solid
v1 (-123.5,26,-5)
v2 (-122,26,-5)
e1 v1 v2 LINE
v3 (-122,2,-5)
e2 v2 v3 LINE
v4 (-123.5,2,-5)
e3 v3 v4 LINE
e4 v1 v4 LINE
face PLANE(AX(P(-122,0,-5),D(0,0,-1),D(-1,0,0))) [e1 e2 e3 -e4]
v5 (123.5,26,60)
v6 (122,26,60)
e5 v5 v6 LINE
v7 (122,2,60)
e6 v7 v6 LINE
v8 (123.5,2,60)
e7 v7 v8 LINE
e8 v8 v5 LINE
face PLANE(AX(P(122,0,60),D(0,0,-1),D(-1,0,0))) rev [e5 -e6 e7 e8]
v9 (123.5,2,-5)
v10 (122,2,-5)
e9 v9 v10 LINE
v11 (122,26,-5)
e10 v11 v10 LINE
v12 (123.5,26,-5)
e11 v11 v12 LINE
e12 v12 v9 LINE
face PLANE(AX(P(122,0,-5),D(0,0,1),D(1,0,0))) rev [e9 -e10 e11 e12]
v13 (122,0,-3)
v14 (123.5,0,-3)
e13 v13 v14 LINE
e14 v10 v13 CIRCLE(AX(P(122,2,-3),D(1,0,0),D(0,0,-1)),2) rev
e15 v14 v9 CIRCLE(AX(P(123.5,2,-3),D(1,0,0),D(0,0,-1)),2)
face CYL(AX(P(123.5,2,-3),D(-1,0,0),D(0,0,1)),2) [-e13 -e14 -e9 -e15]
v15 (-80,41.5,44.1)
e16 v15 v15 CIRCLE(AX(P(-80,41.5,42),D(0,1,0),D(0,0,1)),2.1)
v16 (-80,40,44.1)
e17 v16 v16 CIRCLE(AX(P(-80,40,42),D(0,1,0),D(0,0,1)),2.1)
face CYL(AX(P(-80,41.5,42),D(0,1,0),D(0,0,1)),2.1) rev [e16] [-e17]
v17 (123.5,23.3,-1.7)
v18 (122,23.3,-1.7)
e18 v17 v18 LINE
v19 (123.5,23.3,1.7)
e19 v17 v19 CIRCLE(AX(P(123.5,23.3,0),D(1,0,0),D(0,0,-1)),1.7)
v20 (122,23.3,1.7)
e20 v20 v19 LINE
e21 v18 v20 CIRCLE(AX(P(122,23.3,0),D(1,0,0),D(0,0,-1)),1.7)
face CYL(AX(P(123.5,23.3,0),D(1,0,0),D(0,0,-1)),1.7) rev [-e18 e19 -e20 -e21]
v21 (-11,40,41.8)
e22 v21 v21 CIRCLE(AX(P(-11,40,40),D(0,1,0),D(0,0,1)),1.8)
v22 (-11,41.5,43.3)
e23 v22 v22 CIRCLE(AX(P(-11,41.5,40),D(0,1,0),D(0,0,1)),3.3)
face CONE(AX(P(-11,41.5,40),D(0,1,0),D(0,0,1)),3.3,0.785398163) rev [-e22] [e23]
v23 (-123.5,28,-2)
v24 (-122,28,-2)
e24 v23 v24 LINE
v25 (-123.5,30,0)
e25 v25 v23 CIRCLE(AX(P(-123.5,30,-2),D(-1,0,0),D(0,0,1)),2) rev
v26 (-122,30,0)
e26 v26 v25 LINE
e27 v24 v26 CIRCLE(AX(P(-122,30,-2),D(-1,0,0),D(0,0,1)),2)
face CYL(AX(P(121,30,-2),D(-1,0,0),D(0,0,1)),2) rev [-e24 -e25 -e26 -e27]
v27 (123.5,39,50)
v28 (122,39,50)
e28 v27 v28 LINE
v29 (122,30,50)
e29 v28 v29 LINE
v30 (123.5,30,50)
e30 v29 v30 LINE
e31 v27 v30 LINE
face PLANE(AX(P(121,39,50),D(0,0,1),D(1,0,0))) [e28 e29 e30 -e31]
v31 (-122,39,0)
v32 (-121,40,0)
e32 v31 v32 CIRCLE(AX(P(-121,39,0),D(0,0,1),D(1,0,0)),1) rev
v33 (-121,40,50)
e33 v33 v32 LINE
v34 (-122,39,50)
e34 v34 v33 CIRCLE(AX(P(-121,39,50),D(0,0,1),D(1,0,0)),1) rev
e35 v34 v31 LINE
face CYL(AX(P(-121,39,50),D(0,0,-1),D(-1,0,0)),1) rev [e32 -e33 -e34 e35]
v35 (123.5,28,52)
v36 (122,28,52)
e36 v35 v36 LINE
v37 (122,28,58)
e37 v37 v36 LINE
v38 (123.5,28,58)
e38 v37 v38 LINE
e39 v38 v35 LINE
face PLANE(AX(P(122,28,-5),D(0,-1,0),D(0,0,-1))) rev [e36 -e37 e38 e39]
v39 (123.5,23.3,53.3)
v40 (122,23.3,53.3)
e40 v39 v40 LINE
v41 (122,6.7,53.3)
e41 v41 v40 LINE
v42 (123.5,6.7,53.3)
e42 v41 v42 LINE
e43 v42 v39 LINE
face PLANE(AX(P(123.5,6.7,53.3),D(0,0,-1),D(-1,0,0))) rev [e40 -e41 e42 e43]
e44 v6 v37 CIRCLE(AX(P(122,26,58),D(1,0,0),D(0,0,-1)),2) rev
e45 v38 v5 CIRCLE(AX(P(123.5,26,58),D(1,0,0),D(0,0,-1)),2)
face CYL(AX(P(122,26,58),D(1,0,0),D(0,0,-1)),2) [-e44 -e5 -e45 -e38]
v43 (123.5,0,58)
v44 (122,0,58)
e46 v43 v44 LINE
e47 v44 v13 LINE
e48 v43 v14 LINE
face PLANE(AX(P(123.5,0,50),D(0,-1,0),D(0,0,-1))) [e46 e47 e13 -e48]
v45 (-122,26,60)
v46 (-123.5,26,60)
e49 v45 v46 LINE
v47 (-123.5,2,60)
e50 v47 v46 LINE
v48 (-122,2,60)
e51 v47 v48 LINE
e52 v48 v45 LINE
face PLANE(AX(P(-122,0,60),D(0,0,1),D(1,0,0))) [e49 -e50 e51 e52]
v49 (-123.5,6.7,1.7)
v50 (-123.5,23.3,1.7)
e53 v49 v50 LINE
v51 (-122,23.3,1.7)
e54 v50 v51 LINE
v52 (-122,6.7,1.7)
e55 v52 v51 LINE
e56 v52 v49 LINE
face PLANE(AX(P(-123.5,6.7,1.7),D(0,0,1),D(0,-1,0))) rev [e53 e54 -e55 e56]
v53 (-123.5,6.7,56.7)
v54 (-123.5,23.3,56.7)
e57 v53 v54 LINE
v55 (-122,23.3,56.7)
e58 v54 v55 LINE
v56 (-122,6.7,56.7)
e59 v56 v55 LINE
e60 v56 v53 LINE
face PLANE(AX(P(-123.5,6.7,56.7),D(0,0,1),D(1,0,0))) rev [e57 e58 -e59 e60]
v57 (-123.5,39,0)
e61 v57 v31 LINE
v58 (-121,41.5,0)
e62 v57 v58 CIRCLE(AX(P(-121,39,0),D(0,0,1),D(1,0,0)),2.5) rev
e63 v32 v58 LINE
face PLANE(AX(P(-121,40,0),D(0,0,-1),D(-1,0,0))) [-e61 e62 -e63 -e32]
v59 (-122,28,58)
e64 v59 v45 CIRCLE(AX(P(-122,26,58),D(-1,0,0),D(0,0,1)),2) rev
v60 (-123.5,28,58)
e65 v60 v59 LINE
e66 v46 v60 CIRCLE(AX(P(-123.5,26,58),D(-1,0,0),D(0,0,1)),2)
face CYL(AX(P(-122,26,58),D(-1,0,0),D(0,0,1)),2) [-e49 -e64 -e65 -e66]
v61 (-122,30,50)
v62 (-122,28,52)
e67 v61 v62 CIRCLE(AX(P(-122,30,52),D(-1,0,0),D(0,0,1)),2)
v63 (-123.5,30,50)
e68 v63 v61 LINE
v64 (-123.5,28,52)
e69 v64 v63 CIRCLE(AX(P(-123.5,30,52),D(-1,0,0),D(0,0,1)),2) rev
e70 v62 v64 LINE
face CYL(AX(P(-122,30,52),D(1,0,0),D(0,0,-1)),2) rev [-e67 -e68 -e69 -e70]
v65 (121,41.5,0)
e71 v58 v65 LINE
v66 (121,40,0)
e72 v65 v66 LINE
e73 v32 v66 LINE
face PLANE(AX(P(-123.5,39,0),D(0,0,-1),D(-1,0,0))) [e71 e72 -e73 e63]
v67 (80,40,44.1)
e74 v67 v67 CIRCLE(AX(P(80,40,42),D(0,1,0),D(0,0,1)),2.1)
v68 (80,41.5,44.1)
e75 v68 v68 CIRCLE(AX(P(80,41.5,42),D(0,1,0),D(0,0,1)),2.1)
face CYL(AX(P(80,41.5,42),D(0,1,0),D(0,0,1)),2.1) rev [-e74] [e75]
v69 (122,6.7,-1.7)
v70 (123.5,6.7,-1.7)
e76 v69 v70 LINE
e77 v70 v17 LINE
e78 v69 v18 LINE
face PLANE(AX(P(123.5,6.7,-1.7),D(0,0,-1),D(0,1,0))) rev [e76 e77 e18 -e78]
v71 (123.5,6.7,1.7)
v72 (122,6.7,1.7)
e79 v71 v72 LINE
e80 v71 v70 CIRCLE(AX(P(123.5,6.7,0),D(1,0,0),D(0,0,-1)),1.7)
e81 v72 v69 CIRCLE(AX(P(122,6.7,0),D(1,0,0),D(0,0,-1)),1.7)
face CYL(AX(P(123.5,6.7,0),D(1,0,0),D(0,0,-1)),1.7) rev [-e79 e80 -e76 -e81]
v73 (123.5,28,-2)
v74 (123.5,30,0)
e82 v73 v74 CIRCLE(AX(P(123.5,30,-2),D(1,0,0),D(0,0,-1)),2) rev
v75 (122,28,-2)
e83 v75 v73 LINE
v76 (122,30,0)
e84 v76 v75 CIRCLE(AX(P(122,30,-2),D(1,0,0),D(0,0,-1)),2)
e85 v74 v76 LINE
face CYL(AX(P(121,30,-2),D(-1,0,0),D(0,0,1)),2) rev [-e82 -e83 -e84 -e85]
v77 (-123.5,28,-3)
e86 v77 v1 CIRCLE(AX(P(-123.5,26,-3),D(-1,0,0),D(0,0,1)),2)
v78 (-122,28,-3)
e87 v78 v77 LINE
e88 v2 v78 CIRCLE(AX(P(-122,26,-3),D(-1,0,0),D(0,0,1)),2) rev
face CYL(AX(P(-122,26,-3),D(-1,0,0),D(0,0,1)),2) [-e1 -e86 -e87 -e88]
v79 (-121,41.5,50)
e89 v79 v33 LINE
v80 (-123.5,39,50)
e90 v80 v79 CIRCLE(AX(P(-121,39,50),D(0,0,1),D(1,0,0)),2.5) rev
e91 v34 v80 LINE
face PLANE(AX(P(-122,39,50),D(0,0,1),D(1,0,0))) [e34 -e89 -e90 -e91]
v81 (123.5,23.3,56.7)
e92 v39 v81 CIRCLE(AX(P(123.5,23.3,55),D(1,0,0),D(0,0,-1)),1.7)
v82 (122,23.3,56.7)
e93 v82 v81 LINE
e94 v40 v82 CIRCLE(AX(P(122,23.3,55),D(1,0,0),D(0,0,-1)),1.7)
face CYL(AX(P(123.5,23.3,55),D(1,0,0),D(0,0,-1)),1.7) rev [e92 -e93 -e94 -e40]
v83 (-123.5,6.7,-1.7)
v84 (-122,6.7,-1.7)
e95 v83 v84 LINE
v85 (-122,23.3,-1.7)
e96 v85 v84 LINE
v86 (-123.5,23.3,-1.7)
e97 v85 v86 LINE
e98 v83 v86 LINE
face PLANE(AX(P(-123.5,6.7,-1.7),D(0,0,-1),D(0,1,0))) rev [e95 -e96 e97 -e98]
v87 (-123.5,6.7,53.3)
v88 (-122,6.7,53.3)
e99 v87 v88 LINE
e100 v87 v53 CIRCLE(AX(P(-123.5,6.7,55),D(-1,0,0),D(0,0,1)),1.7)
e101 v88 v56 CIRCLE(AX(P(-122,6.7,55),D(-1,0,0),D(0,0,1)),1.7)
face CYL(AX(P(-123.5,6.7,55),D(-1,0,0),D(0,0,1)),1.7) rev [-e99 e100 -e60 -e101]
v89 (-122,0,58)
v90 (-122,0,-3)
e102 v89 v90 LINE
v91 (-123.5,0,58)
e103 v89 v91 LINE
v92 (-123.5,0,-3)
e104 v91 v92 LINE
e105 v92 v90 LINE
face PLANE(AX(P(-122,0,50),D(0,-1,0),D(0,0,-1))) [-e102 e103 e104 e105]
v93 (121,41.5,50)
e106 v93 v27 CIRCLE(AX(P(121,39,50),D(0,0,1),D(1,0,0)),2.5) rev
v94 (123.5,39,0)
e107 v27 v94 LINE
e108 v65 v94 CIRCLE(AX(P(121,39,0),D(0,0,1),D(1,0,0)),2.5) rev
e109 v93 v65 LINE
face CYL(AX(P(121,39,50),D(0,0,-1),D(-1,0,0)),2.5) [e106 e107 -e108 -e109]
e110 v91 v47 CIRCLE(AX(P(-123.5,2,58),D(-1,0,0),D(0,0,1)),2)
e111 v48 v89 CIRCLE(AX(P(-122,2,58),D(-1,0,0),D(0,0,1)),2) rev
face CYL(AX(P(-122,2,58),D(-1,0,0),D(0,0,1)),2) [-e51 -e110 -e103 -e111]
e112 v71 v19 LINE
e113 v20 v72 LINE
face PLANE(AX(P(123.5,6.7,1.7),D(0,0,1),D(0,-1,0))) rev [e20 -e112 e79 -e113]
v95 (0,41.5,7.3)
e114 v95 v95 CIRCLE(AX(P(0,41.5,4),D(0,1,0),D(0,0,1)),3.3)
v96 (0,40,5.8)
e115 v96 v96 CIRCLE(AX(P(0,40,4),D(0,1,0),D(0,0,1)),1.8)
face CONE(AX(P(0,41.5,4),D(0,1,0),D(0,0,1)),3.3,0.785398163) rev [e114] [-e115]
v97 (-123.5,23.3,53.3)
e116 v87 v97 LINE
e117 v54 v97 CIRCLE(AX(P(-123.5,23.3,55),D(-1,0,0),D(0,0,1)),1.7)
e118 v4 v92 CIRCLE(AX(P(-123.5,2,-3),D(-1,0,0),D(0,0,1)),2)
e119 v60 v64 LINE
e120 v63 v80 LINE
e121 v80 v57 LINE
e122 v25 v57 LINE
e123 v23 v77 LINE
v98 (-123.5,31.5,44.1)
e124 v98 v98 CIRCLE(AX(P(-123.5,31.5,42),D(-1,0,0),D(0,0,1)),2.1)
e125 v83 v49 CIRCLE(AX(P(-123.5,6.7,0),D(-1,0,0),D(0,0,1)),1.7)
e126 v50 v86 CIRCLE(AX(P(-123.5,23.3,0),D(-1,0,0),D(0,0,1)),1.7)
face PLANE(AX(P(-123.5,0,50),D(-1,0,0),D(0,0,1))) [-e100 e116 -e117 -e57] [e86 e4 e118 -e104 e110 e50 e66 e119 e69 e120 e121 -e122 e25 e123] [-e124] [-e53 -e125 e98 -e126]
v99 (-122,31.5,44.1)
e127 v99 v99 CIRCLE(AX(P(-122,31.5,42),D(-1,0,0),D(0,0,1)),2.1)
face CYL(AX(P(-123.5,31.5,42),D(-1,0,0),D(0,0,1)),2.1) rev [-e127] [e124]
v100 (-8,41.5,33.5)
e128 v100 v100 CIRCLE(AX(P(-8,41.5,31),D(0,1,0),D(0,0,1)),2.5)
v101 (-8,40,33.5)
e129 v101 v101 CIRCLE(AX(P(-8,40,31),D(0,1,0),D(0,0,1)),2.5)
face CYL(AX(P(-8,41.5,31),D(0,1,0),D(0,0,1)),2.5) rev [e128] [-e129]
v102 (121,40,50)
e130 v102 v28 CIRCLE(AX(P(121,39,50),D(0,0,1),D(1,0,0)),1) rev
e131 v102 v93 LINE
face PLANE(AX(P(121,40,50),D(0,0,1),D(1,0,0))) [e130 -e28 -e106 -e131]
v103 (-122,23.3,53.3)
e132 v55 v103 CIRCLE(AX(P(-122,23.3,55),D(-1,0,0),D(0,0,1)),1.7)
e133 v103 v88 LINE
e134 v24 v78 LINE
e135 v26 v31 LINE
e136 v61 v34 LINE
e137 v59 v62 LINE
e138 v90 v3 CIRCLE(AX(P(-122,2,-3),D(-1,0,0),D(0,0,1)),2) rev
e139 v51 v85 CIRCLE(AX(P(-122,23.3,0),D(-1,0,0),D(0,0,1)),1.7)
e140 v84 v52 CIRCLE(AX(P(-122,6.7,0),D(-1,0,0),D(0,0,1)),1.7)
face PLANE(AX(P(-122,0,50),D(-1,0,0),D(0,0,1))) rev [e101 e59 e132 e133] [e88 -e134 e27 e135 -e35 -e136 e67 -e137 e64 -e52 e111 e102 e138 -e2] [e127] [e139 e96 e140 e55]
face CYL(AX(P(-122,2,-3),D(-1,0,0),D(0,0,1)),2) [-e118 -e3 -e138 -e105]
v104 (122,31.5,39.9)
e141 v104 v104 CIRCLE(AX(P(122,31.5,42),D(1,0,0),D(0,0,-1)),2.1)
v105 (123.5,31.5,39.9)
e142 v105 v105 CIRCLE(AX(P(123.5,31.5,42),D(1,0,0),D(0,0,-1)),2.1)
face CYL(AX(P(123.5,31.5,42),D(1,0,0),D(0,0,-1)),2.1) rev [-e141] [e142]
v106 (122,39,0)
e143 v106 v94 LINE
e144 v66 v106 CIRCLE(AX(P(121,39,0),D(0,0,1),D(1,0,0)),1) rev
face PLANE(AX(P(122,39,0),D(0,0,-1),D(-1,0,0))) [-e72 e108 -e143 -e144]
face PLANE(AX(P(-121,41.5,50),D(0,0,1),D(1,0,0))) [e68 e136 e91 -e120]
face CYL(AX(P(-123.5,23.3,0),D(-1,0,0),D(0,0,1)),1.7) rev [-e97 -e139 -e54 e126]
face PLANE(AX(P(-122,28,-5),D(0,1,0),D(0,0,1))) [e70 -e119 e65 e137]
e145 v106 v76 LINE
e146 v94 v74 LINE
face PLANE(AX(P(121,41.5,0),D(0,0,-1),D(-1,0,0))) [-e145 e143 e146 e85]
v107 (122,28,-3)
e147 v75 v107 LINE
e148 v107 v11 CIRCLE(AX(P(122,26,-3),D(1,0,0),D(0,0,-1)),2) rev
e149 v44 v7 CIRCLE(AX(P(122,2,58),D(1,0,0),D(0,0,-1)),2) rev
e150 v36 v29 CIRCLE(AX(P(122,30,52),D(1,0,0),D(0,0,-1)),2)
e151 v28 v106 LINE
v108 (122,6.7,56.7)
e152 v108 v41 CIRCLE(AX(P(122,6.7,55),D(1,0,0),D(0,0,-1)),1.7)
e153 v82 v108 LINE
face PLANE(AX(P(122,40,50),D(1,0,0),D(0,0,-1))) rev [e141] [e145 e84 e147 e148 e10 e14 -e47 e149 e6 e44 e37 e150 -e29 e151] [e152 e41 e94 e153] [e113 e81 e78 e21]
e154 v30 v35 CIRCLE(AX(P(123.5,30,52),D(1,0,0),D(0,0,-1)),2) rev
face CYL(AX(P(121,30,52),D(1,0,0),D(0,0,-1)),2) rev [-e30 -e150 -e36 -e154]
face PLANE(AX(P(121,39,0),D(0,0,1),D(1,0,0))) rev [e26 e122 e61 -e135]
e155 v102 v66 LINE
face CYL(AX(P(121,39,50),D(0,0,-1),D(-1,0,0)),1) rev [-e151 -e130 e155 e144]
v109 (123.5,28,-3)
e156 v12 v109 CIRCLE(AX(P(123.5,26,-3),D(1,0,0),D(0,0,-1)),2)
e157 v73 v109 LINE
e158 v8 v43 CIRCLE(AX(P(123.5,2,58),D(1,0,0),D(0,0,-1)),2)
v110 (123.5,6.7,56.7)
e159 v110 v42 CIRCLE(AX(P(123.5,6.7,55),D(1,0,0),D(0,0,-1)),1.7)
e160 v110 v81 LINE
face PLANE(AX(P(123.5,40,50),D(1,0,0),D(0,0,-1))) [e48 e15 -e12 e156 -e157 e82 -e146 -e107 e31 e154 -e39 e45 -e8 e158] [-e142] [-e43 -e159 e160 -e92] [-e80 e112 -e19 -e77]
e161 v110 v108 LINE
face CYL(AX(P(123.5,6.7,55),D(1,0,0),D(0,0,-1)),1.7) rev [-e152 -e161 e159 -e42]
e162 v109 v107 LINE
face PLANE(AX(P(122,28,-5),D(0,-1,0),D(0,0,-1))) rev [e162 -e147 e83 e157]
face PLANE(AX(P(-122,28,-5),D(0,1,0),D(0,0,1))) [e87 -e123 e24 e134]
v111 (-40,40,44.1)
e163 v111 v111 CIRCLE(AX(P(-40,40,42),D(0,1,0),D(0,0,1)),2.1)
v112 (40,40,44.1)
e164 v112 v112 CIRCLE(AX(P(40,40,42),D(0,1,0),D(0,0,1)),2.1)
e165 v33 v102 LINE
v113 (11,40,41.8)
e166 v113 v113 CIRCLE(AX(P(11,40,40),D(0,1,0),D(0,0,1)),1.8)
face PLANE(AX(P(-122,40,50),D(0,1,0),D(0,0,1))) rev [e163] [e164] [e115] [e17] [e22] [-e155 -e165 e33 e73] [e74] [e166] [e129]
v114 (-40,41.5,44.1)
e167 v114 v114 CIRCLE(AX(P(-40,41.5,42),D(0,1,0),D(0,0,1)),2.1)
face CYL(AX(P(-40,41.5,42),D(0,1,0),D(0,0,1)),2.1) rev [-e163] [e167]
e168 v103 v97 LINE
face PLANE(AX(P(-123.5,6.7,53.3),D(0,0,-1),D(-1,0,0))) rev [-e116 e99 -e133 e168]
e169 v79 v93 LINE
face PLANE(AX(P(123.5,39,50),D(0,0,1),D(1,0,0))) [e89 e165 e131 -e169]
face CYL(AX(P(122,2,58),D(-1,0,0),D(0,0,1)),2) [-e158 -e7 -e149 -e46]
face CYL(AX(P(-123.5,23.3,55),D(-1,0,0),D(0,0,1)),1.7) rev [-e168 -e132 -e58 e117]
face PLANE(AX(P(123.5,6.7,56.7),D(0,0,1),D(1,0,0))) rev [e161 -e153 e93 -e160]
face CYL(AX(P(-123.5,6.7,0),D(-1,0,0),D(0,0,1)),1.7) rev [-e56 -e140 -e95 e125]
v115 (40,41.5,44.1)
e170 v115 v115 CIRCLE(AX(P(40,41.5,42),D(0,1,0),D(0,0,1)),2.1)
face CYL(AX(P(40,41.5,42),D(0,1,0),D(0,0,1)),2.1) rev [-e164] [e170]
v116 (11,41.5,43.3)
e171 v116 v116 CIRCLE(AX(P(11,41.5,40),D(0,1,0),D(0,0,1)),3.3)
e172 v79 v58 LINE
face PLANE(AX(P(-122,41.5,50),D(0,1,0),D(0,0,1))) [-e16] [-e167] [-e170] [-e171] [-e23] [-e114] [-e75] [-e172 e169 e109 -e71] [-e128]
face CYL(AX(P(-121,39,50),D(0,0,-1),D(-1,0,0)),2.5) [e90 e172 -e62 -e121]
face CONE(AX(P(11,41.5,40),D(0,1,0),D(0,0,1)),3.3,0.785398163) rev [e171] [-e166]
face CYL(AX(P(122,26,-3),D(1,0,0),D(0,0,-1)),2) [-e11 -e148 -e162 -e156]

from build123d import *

# Parameters (mm, degrees)
SM_BASE_FLANGE_1_DEPTH       = 50
HOLE_WIZARD_1_AT_2_COUNT     = 2
HOLE_WIZARD_1_AT_2_PITCH     = 37.643060449
HOLE_WIZARD_1_AT_3_COUNT     = 2
HOLE_WIZARD_1_AT_3_PITCH     = 37.643060449
HOLE_WIZARD_4_2_4_2_1_D      = 4.2
HOLE_WIZARD_4_2_4_2_2_REACH  = 257.404
HOLE_WIZARD_4_2_4_2_2_BORE_R = 2.1
HOLE_WIZARD_5_0_5_1_D        = 5
SKETCH_18_W                  = 65
SKETCH_18_H                  = 28
SM_BASE_FLANGE_1_2_DEPTH     = 1.5
HOLE_START                   = -123.5
HOLE_WIZARD_3_4_3_4_2_DEPTH  = 1.5
FILLET_1_R                   = 2
FILLET_1_OF_MIRROR_2_R       = 2


# Read off the part's stored shape, not the designer's step: 基体-法兰1, Ø3.4 (3.4) 直径槽口2
# Sheet-metal steps are written as plain solids
with BuildPart() as part:
    # Sm Base Flange 1 outline → Sm Base Flange 1 (new body)
    with BuildSketch(Plane.XY):
        with BuildLine():
            Line((122, 39), (122, 0))
            Line((122, 0), (123.5, 0))
            Line((123.5, 0), (123.5, 39))
            ThreePointArc((123.5, 39), (122.767766953, 40.767766953), (121, 41.5))
            Line((121, 41.5), (-121, 41.5))
            ThreePointArc((-121, 41.5), (-122.767766953, 40.767766953), (-123.5, 39))
            Line((-123.5, 39), (-123.5, 0))
            Line((-123.5, 0), (-122, 0))
            Line((-122, 0), (-122, 39))
            ThreePointArc((-122, 39), (-121.707106781, 39.707106781), (-121, 40))
            Line((-121, 40), (121, 40))
            ThreePointArc((121, 40), (121.707106781, 39.707106781), (122, 39))
        make_face()
    extrude(amount=SM_BASE_FLANGE_1_DEPTH)

    # 草图9 → 打孔尺寸(%根据)开槽沉头木螺钉的类型1 (revolve, cut)
    with BuildSketch(Plane(origin=(0, 41.5, 4), x_dir=(0, 0, 1), z_dir=(1, 0, 0))):
        Polygon((0, 0), (0, 1.5), (1.7, 1.5), (1.7, 1.6), (3.3, 0), align=None)
    hole_wizard_1 = revolve(axis=Axis((0, 47.85, 4), (0, -1, 0)), mode=Mode.SUBTRACT)

    # 打孔尺寸(%根据)开槽沉头木螺钉的类型1 at 2: 打孔尺寸(%根据)开槽沉头木螺钉的类型1 ×2
    with Locations(*[Vector(-0.29221853559902017, 0, 0.956351571051339) * (i * HOLE_WIZARD_1_AT_2_PITCH) for i in range(1, HOLE_WIZARD_1_AT_2_COUNT)]):
        add(hole_wizard_1, mode=Mode.SUBTRACT)

    # 打孔尺寸(%根据)开槽沉头木螺钉的类型1 at 3: 打孔尺寸(%根据)开槽沉头木螺钉的类型1 ×2
    with Locations(*[Vector(0.2922185355990204, 0, 0.956351571051339) * (i * HOLE_WIZARD_1_AT_3_PITCH) for i in range(1, HOLE_WIZARD_1_AT_3_COUNT)]):
        add(hole_wizard_1, mode=Mode.SUBTRACT)

    # Ø4.2 (4.2) 直径孔1 (through all)
    with Locations(Plane(origin=(0, 41.5, 0), x_dir=(1, 0, 0), z_dir=(0, 1, 0))):
        with Locations((-40, -42), (-80, -42), (40, -42), (80, -42)):
            Hole(HOLE_WIZARD_4_2_4_2_1_D / 2)

    # Ø4.2 (4.2) 直径孔2 bore → Ø4.2 (4.2) 直径孔2 (cut, up to next)
    with BuildSketch(Plane(origin=(123.5, 0, 0), x_dir=(0, 0, -1), z_dir=(1, 0, 0)), mode=Mode.PRIVATE) as hole_wizard_4_2_4_2_2_sk1:
        with Locations((-42, 31.5)):
            Circle(HOLE_WIZARD_4_2_4_2_2_BORE_R)
    hole_wizard_4_2_4_2_2_tool1 = extrude(hole_wizard_4_2_4_2_2_sk1.sketch, amount=-HOLE_WIZARD_4_2_4_2_2_REACH, mode=Mode.PRIVATE) & part.part
    hole_wizard_4_2_4_2_2 = hole_wizard_4_2_4_2_2_tool1.solids().sort_by_distance((123.5, 31.5, 42))[0]
    add(hole_wizard_4_2_4_2_2, mode=Mode.SUBTRACT)

    # 镜向1: Ø4.2 (4.2) 直径孔2 across plane
    add(hole_wizard_4_2_4_2_2.mirror(Plane(origin=(0, 0, 0), x_dir=(0, 0, 1), z_dir=(1, 0, 0))), mode=Mode.SUBTRACT)

    # Ø5.0 (5) 直径孔1 (through all)
    with Locations(Plane(origin=(0, 41.5, 0), x_dir=(1, 0, 0), z_dir=(0, 1, 0))):
        with Locations((-8, -31)):
            Hole(HOLE_WIZARD_5_0_5_1_D / 2)

    # 草图18 → Sm Base Flange 1 2 (add)
    with BuildSketch(Plane.ZY.offset(123.5)):
        with Locations((27.5, 14)):
            Rectangle(SKETCH_18_W, SKETCH_18_H)
    sm_base_flange_1_2 = extrude(amount=-SM_BASE_FLANGE_1_2_DEPTH)

    # Ø3.4 (3.4) 直径槽口2 outline → Ø3.4 (3.4) 直径槽口2 (cut)
    with BuildSketch(Plane.YZ.offset(HOLE_START)):
        with BuildLine():
            ThreePointArc((23.3, 53.3), (25, 55), (23.3, 56.7))
            Line((23.3, 56.7), (6.7, 56.7))
            ThreePointArc((6.7, 56.7), (5, 55), (6.7, 53.3))
            Line((6.7, 53.3), (23.3, 53.3))
        make_face()
        with BuildLine():
            ThreePointArc((23.3, -1.7), (25, 0), (23.3, 1.7))
            Line((23.3, 1.7), (6.7, 1.7))
            ThreePointArc((6.7, 1.7), (5, 0), (6.7, -1.7))
            Line((6.7, -1.7), (23.3, -1.7))
        make_face()
    hole_wizard_3_4_3_4_2 = extrude(amount=HOLE_WIZARD_3_4_3_4_2_DEPTH, mode=Mode.SUBTRACT)

    # 圆角1
    fillet_1_edges = [part.edges().sort_by_distance(p)[0] for p in [
        (-122.75, 28, 0),
        (-122.75, 28, -5),
        (-122.75, 28, 60),
        (-122.75, 0, 60),
        (-122.75, 0, -5),
        (-122.75, 28, 50),
    ]]
    fillet(fillet_1_edges, radius=FILLET_1_R)

    # 镜向2: Sm Base Flange 1 2, Ø3.4 (3.4) 直径槽口2 across plane
    add(sm_base_flange_1_2.mirror(Plane(origin=(0, 0, 0), x_dir=(0, 0, 1), z_dir=(1, 0, 0))))
    add(hole_wizard_3_4_3_4_2.mirror(Plane(origin=(0, 0, 0), x_dir=(0, 0, 1), z_dir=(1, 0, 0))), mode=Mode.SUBTRACT)

    # 圆角1 of 镜向2
    fillet_1_of_mirror_2_edges = [part.edges().sort_by_distance(p)[0] for p in [
        (122.75, 28, 0),
        (122.75, 28, -5),
        (122.75, 28, 60),
        (122.75, 0, 60),
        (122.75, 0, -5),
        (122.75, 28, 50),
    ]]
    fillet(fillet_1_of_mirror_2_edges, radius=FILLET_1_OF_MIRROR_2_R)


solid = part.part
